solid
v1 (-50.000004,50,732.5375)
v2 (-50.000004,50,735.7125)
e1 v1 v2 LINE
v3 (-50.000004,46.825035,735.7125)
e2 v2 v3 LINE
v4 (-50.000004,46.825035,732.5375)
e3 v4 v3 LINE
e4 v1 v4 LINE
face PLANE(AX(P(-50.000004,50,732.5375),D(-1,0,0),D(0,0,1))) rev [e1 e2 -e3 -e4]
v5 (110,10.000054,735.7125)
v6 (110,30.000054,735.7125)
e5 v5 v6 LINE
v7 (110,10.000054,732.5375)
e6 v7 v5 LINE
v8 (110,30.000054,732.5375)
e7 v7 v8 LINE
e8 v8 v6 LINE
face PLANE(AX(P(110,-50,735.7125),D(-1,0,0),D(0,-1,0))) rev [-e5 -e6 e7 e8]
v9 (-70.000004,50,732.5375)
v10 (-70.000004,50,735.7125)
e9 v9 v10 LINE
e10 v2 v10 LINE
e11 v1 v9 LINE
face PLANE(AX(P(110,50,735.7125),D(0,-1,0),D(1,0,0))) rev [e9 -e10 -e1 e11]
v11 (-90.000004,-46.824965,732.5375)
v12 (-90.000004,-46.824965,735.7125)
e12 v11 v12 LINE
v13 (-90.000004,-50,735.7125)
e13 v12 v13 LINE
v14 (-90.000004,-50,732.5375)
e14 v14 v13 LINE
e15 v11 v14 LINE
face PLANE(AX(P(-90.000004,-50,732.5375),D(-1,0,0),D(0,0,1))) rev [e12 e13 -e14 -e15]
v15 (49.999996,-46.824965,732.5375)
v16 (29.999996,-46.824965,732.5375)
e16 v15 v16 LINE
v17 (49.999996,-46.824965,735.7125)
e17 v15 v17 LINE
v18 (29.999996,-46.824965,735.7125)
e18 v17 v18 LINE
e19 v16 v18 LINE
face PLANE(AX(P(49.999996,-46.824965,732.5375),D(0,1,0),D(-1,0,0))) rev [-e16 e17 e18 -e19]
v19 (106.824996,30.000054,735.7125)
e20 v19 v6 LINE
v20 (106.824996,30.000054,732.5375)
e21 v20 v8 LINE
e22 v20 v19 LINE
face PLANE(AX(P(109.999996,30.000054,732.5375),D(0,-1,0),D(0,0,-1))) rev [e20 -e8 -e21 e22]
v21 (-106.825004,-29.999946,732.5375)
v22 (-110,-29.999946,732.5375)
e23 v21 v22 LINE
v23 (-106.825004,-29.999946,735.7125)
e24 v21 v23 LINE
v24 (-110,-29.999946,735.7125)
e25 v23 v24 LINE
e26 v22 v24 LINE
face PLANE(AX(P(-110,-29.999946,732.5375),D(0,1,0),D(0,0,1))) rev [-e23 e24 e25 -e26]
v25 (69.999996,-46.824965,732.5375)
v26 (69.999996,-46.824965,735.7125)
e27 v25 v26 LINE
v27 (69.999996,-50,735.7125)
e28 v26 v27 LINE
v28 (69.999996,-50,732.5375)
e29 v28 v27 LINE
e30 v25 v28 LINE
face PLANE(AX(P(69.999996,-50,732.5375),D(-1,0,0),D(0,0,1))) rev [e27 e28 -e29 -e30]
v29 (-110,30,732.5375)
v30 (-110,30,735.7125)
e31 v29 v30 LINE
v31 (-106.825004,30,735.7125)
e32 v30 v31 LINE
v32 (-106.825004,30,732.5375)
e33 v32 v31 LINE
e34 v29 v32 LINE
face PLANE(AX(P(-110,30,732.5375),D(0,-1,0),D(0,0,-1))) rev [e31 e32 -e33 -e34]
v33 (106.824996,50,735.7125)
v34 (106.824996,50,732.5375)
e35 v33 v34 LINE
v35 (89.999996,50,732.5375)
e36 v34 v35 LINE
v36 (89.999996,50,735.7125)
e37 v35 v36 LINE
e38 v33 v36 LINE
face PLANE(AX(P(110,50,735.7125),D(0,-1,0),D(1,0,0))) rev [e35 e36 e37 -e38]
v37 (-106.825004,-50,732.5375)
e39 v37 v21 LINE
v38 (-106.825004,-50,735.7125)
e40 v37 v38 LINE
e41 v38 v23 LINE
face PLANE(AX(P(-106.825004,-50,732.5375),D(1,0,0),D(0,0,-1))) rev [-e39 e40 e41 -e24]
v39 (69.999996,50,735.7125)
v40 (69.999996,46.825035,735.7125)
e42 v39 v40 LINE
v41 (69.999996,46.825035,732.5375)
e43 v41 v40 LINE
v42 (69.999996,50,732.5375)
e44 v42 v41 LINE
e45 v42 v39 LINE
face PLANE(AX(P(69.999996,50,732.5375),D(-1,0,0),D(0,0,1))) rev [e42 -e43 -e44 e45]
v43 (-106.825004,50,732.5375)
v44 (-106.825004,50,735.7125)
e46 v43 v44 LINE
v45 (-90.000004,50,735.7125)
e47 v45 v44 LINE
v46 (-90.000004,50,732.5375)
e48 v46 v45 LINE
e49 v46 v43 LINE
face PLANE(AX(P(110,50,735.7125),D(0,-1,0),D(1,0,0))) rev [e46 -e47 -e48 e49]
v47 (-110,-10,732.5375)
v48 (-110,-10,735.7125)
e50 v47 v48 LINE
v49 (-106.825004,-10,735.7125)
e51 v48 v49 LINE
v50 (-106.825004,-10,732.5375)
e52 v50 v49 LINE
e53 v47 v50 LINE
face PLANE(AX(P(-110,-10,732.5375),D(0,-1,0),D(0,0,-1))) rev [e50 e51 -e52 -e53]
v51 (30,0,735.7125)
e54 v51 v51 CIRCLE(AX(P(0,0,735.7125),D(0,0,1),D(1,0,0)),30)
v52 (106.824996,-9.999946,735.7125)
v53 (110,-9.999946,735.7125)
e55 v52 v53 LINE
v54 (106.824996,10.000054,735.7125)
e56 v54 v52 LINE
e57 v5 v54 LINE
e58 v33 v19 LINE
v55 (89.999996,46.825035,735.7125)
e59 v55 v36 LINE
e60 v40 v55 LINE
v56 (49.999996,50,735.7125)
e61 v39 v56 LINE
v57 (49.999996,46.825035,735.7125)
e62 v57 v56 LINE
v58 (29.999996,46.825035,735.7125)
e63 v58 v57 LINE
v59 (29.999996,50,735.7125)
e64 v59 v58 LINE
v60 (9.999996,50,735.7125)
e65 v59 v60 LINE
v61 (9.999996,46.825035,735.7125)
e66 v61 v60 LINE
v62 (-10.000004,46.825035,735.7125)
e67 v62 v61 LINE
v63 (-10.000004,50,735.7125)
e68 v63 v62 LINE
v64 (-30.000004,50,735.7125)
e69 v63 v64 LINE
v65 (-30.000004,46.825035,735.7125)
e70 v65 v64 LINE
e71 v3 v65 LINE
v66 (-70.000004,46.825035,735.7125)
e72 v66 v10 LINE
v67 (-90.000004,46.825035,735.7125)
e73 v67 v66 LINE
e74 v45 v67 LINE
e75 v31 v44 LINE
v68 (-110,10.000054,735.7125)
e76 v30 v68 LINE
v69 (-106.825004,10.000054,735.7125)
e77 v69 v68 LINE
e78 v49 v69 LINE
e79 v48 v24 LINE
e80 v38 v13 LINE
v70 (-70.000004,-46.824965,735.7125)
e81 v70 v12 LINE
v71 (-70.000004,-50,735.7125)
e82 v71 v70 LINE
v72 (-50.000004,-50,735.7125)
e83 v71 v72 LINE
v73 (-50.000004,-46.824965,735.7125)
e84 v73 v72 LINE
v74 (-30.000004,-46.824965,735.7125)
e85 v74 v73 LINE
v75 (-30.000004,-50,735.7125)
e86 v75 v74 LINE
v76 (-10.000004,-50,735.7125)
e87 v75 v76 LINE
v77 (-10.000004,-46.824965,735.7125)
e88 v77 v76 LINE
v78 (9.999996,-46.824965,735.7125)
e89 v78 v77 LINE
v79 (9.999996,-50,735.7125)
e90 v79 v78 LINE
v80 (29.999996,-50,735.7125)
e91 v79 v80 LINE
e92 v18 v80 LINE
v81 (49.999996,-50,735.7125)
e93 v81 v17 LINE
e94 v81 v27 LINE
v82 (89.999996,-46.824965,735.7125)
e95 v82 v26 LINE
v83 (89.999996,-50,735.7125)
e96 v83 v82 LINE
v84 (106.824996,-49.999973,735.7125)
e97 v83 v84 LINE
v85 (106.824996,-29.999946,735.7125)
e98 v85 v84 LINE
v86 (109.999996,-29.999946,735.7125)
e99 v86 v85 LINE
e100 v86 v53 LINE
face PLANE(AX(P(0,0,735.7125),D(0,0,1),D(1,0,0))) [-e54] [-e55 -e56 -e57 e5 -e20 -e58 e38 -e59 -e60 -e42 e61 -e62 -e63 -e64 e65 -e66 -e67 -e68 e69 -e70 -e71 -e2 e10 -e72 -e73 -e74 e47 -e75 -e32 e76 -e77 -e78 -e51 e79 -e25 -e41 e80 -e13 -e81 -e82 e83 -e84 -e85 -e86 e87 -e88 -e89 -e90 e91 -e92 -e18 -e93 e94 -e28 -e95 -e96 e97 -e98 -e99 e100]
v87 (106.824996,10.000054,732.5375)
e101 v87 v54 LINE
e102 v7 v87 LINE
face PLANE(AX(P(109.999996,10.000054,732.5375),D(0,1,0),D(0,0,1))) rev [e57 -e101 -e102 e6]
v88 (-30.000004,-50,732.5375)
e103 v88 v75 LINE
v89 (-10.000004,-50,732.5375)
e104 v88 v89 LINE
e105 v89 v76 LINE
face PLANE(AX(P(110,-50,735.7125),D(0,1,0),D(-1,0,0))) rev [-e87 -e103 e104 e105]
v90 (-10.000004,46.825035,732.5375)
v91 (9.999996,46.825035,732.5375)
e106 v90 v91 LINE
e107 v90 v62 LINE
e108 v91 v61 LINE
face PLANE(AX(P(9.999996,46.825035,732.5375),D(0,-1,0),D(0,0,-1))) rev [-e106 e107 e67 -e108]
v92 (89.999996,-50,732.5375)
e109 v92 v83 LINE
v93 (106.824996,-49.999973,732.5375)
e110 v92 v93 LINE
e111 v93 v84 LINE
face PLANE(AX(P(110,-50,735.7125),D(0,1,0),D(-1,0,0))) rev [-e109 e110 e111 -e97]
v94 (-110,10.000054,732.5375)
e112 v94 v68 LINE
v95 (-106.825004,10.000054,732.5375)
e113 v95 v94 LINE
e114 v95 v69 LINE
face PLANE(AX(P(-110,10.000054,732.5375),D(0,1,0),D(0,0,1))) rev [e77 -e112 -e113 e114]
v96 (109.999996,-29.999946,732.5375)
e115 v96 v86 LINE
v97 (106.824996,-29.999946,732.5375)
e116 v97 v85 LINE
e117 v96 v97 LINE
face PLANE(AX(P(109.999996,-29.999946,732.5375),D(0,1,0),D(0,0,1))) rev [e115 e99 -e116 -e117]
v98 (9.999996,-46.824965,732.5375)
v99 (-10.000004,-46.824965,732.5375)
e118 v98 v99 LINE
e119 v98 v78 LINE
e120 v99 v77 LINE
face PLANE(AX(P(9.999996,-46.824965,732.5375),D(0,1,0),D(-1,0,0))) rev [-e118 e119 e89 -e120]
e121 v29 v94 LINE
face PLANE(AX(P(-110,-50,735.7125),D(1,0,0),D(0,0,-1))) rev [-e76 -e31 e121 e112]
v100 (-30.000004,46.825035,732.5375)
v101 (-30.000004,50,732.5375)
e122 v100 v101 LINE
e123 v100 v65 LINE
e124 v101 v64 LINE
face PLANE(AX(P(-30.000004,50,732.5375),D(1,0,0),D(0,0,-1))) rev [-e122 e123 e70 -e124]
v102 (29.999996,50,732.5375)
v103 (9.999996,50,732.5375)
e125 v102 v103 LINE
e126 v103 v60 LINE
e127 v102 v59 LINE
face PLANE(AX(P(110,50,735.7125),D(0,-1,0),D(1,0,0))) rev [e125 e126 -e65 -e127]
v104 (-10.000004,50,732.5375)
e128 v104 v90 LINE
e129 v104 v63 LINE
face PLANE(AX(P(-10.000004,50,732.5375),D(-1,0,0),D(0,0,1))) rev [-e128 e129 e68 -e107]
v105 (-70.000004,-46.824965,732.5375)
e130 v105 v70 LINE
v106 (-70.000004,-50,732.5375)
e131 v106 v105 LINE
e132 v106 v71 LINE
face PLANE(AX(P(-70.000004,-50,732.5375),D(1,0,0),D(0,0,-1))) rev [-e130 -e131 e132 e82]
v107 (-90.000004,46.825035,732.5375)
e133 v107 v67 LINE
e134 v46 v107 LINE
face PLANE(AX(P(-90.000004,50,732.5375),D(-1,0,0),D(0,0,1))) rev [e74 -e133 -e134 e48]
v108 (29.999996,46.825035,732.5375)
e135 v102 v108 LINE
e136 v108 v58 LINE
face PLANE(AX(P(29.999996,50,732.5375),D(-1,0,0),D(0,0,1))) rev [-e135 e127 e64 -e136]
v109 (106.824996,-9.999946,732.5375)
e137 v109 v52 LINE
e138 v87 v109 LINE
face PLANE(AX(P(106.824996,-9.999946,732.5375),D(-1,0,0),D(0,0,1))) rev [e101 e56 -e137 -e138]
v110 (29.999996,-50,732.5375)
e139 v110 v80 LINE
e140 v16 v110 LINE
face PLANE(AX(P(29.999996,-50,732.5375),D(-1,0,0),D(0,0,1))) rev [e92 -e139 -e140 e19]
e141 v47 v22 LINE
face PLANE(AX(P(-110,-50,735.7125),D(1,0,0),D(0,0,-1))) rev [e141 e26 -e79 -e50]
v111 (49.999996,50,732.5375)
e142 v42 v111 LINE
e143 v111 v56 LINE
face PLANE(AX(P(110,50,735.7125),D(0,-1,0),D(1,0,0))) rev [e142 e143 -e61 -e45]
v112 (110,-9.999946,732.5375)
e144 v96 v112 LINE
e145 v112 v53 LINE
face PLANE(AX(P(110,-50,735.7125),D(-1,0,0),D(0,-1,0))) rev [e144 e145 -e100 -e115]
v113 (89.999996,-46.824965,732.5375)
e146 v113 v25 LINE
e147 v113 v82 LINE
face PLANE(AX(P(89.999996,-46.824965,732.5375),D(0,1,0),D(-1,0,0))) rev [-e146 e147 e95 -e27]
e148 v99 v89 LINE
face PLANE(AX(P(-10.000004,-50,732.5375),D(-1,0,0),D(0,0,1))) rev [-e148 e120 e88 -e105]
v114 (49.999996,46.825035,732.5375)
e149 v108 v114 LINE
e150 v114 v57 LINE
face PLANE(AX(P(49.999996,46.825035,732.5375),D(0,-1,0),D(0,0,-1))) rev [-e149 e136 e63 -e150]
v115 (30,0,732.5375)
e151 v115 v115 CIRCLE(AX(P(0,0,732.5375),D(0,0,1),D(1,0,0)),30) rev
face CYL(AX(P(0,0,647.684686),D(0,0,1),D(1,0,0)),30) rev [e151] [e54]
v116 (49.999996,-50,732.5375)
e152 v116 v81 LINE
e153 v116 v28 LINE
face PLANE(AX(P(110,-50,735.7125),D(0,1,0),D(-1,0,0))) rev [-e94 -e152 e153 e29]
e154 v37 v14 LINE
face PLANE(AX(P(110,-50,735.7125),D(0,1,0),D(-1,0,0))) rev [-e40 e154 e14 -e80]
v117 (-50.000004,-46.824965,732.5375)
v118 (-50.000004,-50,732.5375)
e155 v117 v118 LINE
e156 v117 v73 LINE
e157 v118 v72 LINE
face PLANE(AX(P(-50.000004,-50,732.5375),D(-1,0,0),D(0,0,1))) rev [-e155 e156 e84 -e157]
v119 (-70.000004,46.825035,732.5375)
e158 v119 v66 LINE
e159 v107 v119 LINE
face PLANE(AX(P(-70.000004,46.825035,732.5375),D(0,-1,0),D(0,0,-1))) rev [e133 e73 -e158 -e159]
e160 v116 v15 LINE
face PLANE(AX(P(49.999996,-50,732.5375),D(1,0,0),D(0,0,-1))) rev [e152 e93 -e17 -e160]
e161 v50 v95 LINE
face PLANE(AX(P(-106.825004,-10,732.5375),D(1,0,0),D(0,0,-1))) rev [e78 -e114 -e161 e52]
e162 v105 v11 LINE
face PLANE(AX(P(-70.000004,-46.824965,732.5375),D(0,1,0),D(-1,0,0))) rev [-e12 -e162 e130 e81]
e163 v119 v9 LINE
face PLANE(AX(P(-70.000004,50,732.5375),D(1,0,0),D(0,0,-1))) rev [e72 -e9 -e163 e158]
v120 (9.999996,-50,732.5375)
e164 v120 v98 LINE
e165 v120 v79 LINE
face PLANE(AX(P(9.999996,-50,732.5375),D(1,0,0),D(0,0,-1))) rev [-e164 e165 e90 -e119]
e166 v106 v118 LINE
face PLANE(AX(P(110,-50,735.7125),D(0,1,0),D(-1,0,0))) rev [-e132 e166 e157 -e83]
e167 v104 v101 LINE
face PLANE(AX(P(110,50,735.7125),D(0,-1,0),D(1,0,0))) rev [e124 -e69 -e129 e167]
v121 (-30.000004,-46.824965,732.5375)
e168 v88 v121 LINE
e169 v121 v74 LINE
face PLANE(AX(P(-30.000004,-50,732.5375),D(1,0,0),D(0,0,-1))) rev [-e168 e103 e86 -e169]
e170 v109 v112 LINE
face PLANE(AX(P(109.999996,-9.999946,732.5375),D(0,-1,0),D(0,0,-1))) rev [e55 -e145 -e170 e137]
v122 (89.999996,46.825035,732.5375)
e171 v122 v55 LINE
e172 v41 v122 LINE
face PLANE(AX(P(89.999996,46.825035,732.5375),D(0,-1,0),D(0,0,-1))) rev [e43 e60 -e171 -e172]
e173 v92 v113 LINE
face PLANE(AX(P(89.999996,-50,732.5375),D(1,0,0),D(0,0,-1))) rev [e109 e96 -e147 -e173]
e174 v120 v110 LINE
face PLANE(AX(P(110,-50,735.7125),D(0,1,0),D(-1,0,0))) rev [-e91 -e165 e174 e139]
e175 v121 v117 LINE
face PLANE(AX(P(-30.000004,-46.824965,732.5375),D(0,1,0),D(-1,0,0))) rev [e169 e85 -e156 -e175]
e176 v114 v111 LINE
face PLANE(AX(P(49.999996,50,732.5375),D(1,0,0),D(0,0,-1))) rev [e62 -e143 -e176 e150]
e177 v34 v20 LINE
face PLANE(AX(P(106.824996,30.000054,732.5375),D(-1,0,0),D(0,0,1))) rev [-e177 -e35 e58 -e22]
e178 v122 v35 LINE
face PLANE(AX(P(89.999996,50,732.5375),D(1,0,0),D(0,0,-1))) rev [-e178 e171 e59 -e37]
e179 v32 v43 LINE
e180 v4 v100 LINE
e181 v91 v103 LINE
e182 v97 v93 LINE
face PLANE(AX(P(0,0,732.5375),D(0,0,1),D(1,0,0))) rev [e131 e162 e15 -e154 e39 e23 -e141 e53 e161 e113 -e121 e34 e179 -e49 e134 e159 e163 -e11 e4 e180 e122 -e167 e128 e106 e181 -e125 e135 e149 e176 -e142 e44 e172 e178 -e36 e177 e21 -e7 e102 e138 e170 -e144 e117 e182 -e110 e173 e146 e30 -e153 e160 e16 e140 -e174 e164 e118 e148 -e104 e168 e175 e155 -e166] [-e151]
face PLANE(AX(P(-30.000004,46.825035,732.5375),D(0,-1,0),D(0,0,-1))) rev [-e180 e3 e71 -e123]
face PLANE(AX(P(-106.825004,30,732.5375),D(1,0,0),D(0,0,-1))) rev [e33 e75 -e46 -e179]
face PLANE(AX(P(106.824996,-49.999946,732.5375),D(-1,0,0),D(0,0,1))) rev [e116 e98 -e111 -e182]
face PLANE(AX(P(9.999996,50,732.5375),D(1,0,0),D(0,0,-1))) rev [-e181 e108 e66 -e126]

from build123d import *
from OCP.BRepAlgoAPI import BRepAlgoAPI_Cut
from OCP.TopTools import TopTools_ListOfShape

# Parameters (mm, degrees)
SKETCH1_W           = 2200
SKETCH1_H           = 1000
BOSS_EXTRUDE1_DEPTH = 750
SHELL1_T            = -31.75
SCALE1_SCALE        = 0.1
SKETCH36_W          = 3.1749958
SKETCH36_H          = 20.000053956
SKETCH36_W_2        = 3.175
SKETCH36_H_2        = 20
SKETCH36_W_3        = 20
SKETCH36_H_3        = 3.17496467
SKETCH36_H_4        = 3.17503533
CUT_EXTRUDE18_DEPTH = 3.175
SKETCH37_R          = 30
CUT_EXTRUDE19_DEPTH = 3.175
SKETCH38_W          = 3.331279269
SKETCH38_H          = 0.686362951
CUT_EXTRUDE20_DEPTH = 3.175


with BuildPart() as part:
    # Sketch1 → Boss-Extrude1 (new body)
    with BuildSketch(Plane.XY):
        Rectangle(SKETCH1_W, SKETCH1_H)
    extrude(amount=BOSS_EXTRUDE1_DEPTH)

    # Shell1
    shell1_openings = [part.faces().sort_by_distance(p)[0] for p in [
        (0, -500, 375),
        (-1100, 0, 375),
        (0, 500, 375),
        (1100, 0, 375),
        (0, 0, 0),
    ]]
    offset(amount=SHELL1_T, openings=shell1_openings, kind=Kind.INTERSECTION)


with BuildPart() as part_1:
    # Scale1: scaled about (0, 0, 734.125)
    add(part.part.scale(SCALE1_SCALE).moved(Location((0, 0, 660.7125))))


with BuildPart() as cut_extrude18_tool:
    # Sketch36 → Cut-Extrude18 (new body)
    with BuildSketch(Plane.XY.offset(735.7125)):
        with Locations((-108.4125021, 2.6978e-05)):
            Rectangle(SKETCH36_W, SKETCH36_H)
        with Locations((108.4124958, -39.999946044)):
            Rectangle(SKETCH36_W_2, SKETCH36_H_2)
        with Locations((108.4124958, 5.3956e-05)):
            Rectangle(SKETCH36_W_2, SKETCH36_H_2)
        with Locations((108.4124958, 40.000053956)):
            Rectangle(SKETCH36_W_2, SKETCH36_H_2)
        with Locations((-108.4125021, -39.999973022)):
            Rectangle(SKETCH36_W, SKETCH36_H)
        with Locations((-108.4125021, 40.000026978)):
            Rectangle(SKETCH36_W, SKETCH36_H)
        with Locations((39.9999958, 48.412517665)):
            Rectangle(SKETCH36_W_3, SKETCH36_H_3)
        with Locations((79.9999958, 48.412517665)):
            Rectangle(SKETCH36_W_3, SKETCH36_H_3)
        with Locations((-4.2e-06, 48.412517665)):
            Rectangle(SKETCH36_W_3, SKETCH36_H_3)
        with Locations((-40.0000042, 48.412517665)):
            Rectangle(SKETCH36_W_3, SKETCH36_H_3)
        with Locations((-80.0000042, 48.412517665)):
            Rectangle(SKETCH36_W_3, SKETCH36_H_3)
        with Locations((39.9999958, -48.412482335)):
            Rectangle(SKETCH36_W_3, SKETCH36_H_4)
        with Locations((79.9999958, -48.412482335)):
            Rectangle(SKETCH36_W_3, SKETCH36_H_4)
        with Locations((-4.2e-06, -48.412482335)):
            Rectangle(SKETCH36_W_3, SKETCH36_H_4)
        with Locations((-40.0000042, -48.412482335)):
            Rectangle(SKETCH36_W_3, SKETCH36_H_4)
        with Locations((-80.0000042, -48.412482335)):
            Rectangle(SKETCH36_W_3, SKETCH36_H_4)
    extrude(amount=-CUT_EXTRUDE18_DEPTH)


with BuildPart() as part_2:
    add(part_1.part)

    # Cut-Extrude18: cut by cut_extrude18_tool, with a tolerance
    cut_extrude18_stock = TopTools_ListOfShape()
    cut_extrude18_stock.Append(part_2.part.wrapped)
    cut_extrude18_tools = TopTools_ListOfShape()
    cut_extrude18_tools.Append(cut_extrude18_tool.part.wrapped)
    cut_extrude18_cut = BRepAlgoAPI_Cut()
    cut_extrude18_cut.SetArguments(cut_extrude18_stock)
    cut_extrude18_cut.SetTools(cut_extrude18_tools)
    cut_extrude18_cut.SetFuzzyValue(0.00001)
    cut_extrude18_cut.Build()
    add(Compound.cast(cut_extrude18_cut.Shape()).solids(), mode=Mode.REPLACE)

    # Sketch37 → Cut-Extrude19 (cut)
    with BuildSketch(Plane.XY.offset(735.7125)):
        Circle(SKETCH37_R)
    extrude(amount=-CUT_EXTRUDE19_DEPTH, mode=Mode.SUBTRACT)

    # Sketch38 → Cut-Extrude20 (cut)
    with BuildSketch(Plane.XY.offset(735.7125)):
        with Locations((108.490635435, -49.938595097)):
            Rectangle(SKETCH38_W, SKETCH38_H)
    extrude(amount=-CUT_EXTRUDE20_DEPTH, mode=Mode.SUBTRACT)


solid = part_2.part
